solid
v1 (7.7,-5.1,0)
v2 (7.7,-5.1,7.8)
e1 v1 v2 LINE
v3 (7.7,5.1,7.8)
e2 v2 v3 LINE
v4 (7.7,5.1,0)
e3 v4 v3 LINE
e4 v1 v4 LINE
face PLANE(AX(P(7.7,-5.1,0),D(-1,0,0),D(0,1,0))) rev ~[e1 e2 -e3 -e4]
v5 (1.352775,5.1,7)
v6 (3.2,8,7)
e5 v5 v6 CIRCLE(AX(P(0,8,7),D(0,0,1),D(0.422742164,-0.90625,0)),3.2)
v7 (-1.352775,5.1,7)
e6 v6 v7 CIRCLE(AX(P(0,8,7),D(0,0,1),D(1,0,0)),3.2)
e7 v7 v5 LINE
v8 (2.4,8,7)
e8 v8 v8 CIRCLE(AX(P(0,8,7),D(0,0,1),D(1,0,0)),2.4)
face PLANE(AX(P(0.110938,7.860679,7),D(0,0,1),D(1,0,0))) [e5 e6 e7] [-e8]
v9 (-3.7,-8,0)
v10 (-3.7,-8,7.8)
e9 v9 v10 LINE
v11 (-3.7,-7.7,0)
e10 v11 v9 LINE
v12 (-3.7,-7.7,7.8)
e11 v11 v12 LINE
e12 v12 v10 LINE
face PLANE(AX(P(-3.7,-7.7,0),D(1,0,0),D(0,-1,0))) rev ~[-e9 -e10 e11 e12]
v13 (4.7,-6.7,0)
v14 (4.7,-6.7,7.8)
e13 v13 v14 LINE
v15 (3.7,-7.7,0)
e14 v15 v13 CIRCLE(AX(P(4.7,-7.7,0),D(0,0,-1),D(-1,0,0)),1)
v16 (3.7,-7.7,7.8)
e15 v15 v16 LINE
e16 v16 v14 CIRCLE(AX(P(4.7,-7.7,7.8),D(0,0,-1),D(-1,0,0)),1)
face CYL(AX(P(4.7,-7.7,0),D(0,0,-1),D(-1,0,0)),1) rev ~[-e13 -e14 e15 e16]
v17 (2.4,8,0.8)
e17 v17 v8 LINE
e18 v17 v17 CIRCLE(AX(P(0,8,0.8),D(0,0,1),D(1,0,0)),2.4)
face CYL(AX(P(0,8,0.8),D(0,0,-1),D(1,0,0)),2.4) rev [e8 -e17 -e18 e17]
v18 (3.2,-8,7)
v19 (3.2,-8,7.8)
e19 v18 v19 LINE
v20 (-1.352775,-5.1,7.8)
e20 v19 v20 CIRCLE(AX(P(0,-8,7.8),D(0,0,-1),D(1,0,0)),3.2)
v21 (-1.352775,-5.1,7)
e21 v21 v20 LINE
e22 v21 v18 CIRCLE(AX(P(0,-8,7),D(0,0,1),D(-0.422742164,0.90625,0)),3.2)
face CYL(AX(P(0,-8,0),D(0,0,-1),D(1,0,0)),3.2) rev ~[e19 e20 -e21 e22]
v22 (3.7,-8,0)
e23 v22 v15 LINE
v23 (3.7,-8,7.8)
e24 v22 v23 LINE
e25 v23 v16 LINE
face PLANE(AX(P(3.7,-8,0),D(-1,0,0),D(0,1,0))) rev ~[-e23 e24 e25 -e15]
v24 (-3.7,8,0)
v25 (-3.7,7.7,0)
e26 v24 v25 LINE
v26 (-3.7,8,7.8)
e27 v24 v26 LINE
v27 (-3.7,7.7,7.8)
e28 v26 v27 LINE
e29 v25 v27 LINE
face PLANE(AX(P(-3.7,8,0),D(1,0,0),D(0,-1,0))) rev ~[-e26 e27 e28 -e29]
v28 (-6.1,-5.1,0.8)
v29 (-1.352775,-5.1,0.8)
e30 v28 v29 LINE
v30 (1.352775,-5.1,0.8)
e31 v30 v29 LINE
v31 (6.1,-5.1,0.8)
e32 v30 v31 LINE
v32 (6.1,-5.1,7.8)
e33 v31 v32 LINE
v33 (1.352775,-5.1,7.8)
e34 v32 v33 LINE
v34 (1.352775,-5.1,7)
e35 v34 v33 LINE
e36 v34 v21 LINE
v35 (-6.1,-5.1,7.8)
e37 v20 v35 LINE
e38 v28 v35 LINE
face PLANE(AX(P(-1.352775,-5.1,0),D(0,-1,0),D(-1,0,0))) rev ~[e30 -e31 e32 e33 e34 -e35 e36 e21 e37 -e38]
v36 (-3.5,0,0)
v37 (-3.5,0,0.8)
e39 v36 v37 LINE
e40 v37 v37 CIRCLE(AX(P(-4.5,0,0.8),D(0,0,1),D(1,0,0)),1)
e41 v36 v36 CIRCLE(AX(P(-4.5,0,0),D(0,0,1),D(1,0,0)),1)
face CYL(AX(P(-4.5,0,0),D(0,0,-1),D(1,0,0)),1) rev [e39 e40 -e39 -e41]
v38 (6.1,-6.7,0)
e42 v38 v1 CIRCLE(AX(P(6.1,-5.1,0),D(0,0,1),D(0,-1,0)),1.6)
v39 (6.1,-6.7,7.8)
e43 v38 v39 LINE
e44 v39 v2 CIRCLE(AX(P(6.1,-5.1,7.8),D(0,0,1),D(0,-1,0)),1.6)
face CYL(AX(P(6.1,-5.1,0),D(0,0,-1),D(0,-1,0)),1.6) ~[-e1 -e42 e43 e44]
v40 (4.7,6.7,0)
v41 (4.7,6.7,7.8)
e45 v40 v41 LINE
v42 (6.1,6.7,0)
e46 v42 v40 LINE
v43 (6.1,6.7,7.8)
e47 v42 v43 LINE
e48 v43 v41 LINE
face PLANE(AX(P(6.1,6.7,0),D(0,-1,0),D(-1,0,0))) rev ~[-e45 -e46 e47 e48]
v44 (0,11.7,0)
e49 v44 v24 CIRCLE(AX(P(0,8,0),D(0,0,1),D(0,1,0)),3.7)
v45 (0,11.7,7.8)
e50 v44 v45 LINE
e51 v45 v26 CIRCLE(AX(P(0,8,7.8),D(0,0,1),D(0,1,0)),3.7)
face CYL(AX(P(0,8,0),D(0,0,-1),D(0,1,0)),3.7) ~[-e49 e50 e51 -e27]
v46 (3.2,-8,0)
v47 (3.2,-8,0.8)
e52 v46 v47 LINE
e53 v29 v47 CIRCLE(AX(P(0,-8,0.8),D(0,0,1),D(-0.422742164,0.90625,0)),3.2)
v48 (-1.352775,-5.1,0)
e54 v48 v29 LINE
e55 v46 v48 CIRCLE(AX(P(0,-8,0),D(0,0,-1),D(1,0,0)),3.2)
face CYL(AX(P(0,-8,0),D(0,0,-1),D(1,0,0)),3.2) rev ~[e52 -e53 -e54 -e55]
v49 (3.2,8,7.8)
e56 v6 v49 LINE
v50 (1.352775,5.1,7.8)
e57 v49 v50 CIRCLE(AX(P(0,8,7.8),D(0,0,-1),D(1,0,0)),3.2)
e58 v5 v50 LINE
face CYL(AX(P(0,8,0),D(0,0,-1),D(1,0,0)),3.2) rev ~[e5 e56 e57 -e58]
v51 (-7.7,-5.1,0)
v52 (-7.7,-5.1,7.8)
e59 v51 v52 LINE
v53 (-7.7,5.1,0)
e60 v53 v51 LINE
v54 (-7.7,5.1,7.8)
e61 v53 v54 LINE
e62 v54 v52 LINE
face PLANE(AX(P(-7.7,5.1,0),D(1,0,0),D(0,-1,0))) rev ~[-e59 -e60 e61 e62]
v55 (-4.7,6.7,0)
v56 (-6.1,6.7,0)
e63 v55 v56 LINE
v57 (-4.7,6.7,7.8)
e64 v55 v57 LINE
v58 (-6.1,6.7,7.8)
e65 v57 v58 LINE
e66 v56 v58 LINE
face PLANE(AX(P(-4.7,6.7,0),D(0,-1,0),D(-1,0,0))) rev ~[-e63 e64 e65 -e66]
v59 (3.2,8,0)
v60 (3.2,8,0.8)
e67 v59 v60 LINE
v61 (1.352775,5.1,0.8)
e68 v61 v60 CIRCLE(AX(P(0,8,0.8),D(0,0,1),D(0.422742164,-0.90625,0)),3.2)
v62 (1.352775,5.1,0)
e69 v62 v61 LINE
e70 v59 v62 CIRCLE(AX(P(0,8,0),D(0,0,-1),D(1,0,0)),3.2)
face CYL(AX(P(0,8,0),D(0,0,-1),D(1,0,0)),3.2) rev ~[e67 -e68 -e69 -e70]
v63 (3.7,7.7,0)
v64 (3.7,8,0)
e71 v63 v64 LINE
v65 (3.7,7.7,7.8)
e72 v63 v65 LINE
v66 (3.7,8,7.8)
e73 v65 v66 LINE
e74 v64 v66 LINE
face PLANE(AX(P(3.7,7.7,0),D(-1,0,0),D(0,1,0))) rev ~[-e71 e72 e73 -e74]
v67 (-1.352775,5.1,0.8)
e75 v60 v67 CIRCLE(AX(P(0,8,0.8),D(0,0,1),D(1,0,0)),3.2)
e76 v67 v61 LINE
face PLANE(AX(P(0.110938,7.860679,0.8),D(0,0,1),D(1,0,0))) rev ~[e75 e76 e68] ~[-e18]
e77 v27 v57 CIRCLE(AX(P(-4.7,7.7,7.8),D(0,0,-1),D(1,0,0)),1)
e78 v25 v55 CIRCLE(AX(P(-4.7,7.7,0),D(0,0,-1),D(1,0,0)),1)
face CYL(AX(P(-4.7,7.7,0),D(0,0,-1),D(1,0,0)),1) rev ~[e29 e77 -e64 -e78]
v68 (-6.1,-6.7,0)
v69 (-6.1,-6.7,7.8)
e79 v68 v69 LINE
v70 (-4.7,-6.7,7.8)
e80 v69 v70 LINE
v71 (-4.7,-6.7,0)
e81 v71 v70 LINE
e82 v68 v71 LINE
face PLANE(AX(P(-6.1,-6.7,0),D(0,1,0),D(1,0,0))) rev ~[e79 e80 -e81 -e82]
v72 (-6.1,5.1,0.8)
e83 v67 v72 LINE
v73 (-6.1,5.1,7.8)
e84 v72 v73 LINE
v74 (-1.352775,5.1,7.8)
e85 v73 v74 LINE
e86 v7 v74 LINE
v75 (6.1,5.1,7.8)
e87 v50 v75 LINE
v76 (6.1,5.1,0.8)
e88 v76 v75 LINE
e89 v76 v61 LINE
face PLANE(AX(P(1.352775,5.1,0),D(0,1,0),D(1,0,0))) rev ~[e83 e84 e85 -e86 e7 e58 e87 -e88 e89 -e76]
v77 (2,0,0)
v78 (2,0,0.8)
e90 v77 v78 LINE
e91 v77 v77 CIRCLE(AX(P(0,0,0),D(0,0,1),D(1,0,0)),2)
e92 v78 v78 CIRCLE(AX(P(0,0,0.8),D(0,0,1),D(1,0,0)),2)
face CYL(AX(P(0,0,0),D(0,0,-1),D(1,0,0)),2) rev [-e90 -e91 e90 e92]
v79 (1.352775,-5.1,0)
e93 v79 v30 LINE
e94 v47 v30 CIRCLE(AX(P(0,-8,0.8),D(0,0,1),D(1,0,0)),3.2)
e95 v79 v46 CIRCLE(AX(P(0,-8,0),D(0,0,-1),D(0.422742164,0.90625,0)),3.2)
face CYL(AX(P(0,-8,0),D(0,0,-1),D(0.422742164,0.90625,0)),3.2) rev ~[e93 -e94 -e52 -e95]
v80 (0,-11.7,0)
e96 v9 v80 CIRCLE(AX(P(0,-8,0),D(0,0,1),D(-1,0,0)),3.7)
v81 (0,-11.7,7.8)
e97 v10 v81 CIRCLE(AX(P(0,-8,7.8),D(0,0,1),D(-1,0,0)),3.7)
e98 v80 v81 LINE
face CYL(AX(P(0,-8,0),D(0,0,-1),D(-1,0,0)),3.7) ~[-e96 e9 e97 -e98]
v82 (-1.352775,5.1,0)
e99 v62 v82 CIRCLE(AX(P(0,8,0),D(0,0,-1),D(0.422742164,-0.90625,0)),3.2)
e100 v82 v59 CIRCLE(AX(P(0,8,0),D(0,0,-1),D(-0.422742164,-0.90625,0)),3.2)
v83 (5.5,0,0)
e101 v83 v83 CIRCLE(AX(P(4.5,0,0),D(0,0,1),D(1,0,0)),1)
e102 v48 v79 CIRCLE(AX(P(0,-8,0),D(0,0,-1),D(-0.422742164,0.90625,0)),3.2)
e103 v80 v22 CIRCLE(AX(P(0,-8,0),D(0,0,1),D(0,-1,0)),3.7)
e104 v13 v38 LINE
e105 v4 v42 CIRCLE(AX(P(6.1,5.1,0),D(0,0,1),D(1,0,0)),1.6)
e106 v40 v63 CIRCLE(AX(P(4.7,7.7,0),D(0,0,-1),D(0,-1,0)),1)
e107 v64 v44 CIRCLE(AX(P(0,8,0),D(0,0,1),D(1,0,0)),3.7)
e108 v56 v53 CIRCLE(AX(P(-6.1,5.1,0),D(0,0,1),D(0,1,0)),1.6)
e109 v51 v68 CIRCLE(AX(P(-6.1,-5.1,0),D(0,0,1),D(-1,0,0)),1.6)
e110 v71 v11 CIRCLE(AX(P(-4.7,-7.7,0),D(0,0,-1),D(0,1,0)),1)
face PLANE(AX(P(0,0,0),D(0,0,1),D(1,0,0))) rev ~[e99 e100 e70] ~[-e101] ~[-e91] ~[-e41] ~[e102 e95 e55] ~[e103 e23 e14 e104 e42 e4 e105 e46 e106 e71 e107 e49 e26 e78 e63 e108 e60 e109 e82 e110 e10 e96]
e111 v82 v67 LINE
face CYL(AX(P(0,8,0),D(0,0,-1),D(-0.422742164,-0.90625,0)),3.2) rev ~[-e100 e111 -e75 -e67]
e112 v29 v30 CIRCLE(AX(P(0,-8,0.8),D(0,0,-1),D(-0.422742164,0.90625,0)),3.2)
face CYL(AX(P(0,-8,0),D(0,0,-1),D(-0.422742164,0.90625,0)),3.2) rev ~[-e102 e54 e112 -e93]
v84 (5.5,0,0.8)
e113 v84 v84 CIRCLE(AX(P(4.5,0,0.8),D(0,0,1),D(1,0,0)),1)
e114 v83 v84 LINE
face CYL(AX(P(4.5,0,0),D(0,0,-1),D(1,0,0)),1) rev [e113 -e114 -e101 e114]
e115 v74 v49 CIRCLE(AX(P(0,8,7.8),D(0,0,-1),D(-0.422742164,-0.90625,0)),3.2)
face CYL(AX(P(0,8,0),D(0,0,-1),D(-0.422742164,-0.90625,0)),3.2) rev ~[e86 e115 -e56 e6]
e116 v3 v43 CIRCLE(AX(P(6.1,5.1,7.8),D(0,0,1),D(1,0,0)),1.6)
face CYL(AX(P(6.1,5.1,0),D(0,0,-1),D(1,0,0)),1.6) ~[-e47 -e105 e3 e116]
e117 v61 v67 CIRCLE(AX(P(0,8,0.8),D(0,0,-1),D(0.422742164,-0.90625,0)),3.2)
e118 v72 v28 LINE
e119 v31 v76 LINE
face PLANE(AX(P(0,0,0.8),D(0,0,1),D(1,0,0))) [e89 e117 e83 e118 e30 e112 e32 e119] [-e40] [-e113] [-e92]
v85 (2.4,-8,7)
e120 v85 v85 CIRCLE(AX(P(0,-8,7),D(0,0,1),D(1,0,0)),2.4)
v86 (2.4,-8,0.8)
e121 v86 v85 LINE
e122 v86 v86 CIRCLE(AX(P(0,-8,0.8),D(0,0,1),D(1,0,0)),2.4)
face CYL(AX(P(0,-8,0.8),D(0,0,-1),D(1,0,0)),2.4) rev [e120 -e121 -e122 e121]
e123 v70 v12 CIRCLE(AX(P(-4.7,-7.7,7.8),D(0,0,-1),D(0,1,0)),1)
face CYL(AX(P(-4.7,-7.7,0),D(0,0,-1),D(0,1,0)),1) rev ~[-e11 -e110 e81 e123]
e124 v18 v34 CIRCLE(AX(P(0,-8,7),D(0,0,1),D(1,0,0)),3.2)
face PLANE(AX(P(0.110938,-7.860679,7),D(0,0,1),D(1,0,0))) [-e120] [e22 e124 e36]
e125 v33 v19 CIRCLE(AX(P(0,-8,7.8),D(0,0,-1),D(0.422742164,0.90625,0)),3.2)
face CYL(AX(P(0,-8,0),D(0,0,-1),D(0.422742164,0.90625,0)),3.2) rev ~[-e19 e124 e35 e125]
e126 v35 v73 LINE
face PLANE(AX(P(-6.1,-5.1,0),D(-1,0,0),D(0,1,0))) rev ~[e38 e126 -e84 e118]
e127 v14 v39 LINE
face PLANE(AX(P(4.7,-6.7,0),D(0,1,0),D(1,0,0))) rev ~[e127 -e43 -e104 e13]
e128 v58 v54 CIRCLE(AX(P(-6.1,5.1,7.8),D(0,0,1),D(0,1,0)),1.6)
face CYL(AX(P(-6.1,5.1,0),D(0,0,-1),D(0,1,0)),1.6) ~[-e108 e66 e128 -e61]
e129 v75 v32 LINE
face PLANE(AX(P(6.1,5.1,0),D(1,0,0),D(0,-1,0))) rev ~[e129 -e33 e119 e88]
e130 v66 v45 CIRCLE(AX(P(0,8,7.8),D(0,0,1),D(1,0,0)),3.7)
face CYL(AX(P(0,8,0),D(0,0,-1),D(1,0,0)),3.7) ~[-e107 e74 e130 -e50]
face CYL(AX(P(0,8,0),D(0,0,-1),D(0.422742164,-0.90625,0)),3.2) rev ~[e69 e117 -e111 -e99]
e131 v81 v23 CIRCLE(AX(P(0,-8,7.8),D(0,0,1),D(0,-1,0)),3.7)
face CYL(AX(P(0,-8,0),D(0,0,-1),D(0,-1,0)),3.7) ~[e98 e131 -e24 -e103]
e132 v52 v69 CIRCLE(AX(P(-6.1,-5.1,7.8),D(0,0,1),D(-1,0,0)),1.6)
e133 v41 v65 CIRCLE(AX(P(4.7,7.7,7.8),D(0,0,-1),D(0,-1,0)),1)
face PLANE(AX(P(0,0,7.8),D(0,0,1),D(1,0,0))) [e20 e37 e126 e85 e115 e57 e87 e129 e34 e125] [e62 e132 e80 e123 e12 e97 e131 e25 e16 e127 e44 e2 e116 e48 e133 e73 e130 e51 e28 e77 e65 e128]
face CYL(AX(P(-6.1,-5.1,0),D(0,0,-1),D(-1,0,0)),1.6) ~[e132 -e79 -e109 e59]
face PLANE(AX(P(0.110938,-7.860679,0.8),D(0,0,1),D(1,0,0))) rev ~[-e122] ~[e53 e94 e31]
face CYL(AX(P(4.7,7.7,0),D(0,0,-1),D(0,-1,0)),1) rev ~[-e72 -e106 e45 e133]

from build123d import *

# Parameters (mm, degrees)
F1_DEPTH = 7.8
F2_START = 0.8
F0_R     = 2.4
F2_DEPTH = 6.2
F0_R_2   = 1
F0_R_3   = 2
F3_DEPTH = 0.8


# Not quite as in the source:
# - a feature names something its author has since deleted; it is built from what else it names


with BuildPart() as f1:
    # F0 (on Top) → F1 (new body)
    with BuildSketch(Plane.XY):
        with BuildLine():
            ThreePointArc((0, 11.7), (-2.6162950904, 10.6162950904), (-3.7, 8))
            Line((-3.7, 8), (-3.7, 7.7))
            ThreePointArc((-3.7, 7.7), (-3.9928932188, 6.9928932188), (-4.7, 6.7))
            Line((-4.7, 6.7), (-6.1, 6.7))
            ThreePointArc((-6.1, 6.7), (-7.2313708499, 6.2313708499), (-7.7, 5.1))
            Line((-7.7, 5.1), (-7.7, -5.1))
            ThreePointArc((-7.7, -5.1), (-7.2313708499, -6.2313708499), (-6.1, -6.7))
            Line((-6.1, -6.7), (-4.7, -6.7))
            ThreePointArc((-4.7, -6.7), (-3.9928932188, -6.9928932188), (-3.7, -7.7))
            Line((-3.7, -7.7), (-3.7, -8))
            ThreePointArc((-3.7, -8), (-2.6162950904, -10.6162950904), (0, -11.7))
            ThreePointArc((0, -11.7), (2.6162950904, -10.6162950904), (3.7, -8))
            Line((3.7, -8), (3.7, -7.7))
            ThreePointArc((3.7, -7.7), (3.9928932188, -6.9928932188), (4.7, -6.7))
            Line((4.7, -6.7), (6.1, -6.7))
            ThreePointArc((6.1, -6.7), (7.2313708499, -6.2313708499), (7.7, -5.1))
            Line((7.7, -5.1), (7.7, 5.1))
            ThreePointArc((7.7, 5.1), (7.2313708499, 6.2313708499), (6.1, 6.7))
            Line((6.1, 6.7), (4.7, 6.7))
            ThreePointArc((4.7, 6.7), (3.9928932188, 6.9928932188), (3.7, 7.7))
            Line((3.7, 7.7), (3.7, 8))
            ThreePointArc((3.7, 8), (2.6162950904, 10.6162950904), (0, 11.7))
        make_face()
        with BuildLine():
            Line((-6.1, -5.1), (-6.1, 5.1))
            Line((-6.1, 5.1), (-1.3527749258, 5.1))
            ThreePointArc((-1.3527749258, 5.1), (-1.7191742549, 10.698970152), (3.2, 8))
            ThreePointArc((3.2, 8), (2.698970152, 6.2808257451), (1.3527749258, 5.1))
            Line((1.3527749258, 5.1), (6.1, 5.1))
            Line((6.1, 5.1), (6.1, -5.1))
            Line((6.1, -5.1), (1.3527749258, -5.1))
            ThreePointArc((1.3527749258, -5.1), (2.698970152, -6.2808257451), (3.2, -8))
            ThreePointArc((3.2, -8), (-1.7191742549, -10.698970152), (-1.3527749258, -5.1))
            Line((-1.3527749258, -5.1), (-6.1, -5.1))
        make_face(mode=Mode.SUBTRACT)
    extrude(amount=F1_DEPTH)

    # F0 (on Top) → F2 (join)
    with BuildSketch(Plane.XY.offset(F2_START)):
        with BuildLine():
            Line((1.3527749258, -5.1), (-1.3527749258, -5.1))
            ThreePointArc((-1.3527749258, -5.1), (-1.7191742549, -10.698970152), (3.2, -8))
            ThreePointArc((3.2, -8), (2.698970152, -6.2808257451), (1.3527749258, -5.1))
        make_face()
        with Locations((0, -8)):
            Circle(F0_R, mode=Mode.SUBTRACT)
        with BuildLine():
            ThreePointArc((3.2, 8), (-1.7191742549, 10.698970152), (-1.3527749258, 5.1))
            Line((-1.3527749258, 5.1), (1.3527749258, 5.1))
            ThreePointArc((1.3527749258, 5.1), (2.698970152, 6.2808257451), (3.2, 8))
        make_face()
        with Locations((0, 8)):
            Circle(F0_R, mode=Mode.SUBTRACT)
    extrude(amount=F2_DEPTH)

    # F0 (on Top) → F3 (join)
    with BuildSketch(Plane.XY):
        with BuildLine():
            Line((-1.3527749258, 5.1), (-6.1, 5.1))
            Line((-6.1, 5.1), (-6.1, -5.1))
            Line((-6.1, -5.1), (-1.3527749258, -5.1))
            ThreePointArc((-1.3527749258, -5.1), (0, -4.8), (1.3527749258, -5.1))
            Line((1.3527749258, -5.1), (6.1, -5.1))
            Line((6.1, -5.1), (6.1, 5.1))
            Line((6.1, 5.1), (1.3527749258, 5.1))
            ThreePointArc((1.3527749258, 5.1), (0, 4.8), (-1.3527749258, 5.1))
        make_face()
        with Locations((-4.5, 0)):
            Circle(F0_R_2, mode=Mode.SUBTRACT)
        Circle(F0_R_3, mode=Mode.SUBTRACT)
        with Locations((4.5, 0)):
            Circle(F0_R_2, mode=Mode.SUBTRACT)
    extrude(amount=F3_DEPTH)


solid = f1.part
